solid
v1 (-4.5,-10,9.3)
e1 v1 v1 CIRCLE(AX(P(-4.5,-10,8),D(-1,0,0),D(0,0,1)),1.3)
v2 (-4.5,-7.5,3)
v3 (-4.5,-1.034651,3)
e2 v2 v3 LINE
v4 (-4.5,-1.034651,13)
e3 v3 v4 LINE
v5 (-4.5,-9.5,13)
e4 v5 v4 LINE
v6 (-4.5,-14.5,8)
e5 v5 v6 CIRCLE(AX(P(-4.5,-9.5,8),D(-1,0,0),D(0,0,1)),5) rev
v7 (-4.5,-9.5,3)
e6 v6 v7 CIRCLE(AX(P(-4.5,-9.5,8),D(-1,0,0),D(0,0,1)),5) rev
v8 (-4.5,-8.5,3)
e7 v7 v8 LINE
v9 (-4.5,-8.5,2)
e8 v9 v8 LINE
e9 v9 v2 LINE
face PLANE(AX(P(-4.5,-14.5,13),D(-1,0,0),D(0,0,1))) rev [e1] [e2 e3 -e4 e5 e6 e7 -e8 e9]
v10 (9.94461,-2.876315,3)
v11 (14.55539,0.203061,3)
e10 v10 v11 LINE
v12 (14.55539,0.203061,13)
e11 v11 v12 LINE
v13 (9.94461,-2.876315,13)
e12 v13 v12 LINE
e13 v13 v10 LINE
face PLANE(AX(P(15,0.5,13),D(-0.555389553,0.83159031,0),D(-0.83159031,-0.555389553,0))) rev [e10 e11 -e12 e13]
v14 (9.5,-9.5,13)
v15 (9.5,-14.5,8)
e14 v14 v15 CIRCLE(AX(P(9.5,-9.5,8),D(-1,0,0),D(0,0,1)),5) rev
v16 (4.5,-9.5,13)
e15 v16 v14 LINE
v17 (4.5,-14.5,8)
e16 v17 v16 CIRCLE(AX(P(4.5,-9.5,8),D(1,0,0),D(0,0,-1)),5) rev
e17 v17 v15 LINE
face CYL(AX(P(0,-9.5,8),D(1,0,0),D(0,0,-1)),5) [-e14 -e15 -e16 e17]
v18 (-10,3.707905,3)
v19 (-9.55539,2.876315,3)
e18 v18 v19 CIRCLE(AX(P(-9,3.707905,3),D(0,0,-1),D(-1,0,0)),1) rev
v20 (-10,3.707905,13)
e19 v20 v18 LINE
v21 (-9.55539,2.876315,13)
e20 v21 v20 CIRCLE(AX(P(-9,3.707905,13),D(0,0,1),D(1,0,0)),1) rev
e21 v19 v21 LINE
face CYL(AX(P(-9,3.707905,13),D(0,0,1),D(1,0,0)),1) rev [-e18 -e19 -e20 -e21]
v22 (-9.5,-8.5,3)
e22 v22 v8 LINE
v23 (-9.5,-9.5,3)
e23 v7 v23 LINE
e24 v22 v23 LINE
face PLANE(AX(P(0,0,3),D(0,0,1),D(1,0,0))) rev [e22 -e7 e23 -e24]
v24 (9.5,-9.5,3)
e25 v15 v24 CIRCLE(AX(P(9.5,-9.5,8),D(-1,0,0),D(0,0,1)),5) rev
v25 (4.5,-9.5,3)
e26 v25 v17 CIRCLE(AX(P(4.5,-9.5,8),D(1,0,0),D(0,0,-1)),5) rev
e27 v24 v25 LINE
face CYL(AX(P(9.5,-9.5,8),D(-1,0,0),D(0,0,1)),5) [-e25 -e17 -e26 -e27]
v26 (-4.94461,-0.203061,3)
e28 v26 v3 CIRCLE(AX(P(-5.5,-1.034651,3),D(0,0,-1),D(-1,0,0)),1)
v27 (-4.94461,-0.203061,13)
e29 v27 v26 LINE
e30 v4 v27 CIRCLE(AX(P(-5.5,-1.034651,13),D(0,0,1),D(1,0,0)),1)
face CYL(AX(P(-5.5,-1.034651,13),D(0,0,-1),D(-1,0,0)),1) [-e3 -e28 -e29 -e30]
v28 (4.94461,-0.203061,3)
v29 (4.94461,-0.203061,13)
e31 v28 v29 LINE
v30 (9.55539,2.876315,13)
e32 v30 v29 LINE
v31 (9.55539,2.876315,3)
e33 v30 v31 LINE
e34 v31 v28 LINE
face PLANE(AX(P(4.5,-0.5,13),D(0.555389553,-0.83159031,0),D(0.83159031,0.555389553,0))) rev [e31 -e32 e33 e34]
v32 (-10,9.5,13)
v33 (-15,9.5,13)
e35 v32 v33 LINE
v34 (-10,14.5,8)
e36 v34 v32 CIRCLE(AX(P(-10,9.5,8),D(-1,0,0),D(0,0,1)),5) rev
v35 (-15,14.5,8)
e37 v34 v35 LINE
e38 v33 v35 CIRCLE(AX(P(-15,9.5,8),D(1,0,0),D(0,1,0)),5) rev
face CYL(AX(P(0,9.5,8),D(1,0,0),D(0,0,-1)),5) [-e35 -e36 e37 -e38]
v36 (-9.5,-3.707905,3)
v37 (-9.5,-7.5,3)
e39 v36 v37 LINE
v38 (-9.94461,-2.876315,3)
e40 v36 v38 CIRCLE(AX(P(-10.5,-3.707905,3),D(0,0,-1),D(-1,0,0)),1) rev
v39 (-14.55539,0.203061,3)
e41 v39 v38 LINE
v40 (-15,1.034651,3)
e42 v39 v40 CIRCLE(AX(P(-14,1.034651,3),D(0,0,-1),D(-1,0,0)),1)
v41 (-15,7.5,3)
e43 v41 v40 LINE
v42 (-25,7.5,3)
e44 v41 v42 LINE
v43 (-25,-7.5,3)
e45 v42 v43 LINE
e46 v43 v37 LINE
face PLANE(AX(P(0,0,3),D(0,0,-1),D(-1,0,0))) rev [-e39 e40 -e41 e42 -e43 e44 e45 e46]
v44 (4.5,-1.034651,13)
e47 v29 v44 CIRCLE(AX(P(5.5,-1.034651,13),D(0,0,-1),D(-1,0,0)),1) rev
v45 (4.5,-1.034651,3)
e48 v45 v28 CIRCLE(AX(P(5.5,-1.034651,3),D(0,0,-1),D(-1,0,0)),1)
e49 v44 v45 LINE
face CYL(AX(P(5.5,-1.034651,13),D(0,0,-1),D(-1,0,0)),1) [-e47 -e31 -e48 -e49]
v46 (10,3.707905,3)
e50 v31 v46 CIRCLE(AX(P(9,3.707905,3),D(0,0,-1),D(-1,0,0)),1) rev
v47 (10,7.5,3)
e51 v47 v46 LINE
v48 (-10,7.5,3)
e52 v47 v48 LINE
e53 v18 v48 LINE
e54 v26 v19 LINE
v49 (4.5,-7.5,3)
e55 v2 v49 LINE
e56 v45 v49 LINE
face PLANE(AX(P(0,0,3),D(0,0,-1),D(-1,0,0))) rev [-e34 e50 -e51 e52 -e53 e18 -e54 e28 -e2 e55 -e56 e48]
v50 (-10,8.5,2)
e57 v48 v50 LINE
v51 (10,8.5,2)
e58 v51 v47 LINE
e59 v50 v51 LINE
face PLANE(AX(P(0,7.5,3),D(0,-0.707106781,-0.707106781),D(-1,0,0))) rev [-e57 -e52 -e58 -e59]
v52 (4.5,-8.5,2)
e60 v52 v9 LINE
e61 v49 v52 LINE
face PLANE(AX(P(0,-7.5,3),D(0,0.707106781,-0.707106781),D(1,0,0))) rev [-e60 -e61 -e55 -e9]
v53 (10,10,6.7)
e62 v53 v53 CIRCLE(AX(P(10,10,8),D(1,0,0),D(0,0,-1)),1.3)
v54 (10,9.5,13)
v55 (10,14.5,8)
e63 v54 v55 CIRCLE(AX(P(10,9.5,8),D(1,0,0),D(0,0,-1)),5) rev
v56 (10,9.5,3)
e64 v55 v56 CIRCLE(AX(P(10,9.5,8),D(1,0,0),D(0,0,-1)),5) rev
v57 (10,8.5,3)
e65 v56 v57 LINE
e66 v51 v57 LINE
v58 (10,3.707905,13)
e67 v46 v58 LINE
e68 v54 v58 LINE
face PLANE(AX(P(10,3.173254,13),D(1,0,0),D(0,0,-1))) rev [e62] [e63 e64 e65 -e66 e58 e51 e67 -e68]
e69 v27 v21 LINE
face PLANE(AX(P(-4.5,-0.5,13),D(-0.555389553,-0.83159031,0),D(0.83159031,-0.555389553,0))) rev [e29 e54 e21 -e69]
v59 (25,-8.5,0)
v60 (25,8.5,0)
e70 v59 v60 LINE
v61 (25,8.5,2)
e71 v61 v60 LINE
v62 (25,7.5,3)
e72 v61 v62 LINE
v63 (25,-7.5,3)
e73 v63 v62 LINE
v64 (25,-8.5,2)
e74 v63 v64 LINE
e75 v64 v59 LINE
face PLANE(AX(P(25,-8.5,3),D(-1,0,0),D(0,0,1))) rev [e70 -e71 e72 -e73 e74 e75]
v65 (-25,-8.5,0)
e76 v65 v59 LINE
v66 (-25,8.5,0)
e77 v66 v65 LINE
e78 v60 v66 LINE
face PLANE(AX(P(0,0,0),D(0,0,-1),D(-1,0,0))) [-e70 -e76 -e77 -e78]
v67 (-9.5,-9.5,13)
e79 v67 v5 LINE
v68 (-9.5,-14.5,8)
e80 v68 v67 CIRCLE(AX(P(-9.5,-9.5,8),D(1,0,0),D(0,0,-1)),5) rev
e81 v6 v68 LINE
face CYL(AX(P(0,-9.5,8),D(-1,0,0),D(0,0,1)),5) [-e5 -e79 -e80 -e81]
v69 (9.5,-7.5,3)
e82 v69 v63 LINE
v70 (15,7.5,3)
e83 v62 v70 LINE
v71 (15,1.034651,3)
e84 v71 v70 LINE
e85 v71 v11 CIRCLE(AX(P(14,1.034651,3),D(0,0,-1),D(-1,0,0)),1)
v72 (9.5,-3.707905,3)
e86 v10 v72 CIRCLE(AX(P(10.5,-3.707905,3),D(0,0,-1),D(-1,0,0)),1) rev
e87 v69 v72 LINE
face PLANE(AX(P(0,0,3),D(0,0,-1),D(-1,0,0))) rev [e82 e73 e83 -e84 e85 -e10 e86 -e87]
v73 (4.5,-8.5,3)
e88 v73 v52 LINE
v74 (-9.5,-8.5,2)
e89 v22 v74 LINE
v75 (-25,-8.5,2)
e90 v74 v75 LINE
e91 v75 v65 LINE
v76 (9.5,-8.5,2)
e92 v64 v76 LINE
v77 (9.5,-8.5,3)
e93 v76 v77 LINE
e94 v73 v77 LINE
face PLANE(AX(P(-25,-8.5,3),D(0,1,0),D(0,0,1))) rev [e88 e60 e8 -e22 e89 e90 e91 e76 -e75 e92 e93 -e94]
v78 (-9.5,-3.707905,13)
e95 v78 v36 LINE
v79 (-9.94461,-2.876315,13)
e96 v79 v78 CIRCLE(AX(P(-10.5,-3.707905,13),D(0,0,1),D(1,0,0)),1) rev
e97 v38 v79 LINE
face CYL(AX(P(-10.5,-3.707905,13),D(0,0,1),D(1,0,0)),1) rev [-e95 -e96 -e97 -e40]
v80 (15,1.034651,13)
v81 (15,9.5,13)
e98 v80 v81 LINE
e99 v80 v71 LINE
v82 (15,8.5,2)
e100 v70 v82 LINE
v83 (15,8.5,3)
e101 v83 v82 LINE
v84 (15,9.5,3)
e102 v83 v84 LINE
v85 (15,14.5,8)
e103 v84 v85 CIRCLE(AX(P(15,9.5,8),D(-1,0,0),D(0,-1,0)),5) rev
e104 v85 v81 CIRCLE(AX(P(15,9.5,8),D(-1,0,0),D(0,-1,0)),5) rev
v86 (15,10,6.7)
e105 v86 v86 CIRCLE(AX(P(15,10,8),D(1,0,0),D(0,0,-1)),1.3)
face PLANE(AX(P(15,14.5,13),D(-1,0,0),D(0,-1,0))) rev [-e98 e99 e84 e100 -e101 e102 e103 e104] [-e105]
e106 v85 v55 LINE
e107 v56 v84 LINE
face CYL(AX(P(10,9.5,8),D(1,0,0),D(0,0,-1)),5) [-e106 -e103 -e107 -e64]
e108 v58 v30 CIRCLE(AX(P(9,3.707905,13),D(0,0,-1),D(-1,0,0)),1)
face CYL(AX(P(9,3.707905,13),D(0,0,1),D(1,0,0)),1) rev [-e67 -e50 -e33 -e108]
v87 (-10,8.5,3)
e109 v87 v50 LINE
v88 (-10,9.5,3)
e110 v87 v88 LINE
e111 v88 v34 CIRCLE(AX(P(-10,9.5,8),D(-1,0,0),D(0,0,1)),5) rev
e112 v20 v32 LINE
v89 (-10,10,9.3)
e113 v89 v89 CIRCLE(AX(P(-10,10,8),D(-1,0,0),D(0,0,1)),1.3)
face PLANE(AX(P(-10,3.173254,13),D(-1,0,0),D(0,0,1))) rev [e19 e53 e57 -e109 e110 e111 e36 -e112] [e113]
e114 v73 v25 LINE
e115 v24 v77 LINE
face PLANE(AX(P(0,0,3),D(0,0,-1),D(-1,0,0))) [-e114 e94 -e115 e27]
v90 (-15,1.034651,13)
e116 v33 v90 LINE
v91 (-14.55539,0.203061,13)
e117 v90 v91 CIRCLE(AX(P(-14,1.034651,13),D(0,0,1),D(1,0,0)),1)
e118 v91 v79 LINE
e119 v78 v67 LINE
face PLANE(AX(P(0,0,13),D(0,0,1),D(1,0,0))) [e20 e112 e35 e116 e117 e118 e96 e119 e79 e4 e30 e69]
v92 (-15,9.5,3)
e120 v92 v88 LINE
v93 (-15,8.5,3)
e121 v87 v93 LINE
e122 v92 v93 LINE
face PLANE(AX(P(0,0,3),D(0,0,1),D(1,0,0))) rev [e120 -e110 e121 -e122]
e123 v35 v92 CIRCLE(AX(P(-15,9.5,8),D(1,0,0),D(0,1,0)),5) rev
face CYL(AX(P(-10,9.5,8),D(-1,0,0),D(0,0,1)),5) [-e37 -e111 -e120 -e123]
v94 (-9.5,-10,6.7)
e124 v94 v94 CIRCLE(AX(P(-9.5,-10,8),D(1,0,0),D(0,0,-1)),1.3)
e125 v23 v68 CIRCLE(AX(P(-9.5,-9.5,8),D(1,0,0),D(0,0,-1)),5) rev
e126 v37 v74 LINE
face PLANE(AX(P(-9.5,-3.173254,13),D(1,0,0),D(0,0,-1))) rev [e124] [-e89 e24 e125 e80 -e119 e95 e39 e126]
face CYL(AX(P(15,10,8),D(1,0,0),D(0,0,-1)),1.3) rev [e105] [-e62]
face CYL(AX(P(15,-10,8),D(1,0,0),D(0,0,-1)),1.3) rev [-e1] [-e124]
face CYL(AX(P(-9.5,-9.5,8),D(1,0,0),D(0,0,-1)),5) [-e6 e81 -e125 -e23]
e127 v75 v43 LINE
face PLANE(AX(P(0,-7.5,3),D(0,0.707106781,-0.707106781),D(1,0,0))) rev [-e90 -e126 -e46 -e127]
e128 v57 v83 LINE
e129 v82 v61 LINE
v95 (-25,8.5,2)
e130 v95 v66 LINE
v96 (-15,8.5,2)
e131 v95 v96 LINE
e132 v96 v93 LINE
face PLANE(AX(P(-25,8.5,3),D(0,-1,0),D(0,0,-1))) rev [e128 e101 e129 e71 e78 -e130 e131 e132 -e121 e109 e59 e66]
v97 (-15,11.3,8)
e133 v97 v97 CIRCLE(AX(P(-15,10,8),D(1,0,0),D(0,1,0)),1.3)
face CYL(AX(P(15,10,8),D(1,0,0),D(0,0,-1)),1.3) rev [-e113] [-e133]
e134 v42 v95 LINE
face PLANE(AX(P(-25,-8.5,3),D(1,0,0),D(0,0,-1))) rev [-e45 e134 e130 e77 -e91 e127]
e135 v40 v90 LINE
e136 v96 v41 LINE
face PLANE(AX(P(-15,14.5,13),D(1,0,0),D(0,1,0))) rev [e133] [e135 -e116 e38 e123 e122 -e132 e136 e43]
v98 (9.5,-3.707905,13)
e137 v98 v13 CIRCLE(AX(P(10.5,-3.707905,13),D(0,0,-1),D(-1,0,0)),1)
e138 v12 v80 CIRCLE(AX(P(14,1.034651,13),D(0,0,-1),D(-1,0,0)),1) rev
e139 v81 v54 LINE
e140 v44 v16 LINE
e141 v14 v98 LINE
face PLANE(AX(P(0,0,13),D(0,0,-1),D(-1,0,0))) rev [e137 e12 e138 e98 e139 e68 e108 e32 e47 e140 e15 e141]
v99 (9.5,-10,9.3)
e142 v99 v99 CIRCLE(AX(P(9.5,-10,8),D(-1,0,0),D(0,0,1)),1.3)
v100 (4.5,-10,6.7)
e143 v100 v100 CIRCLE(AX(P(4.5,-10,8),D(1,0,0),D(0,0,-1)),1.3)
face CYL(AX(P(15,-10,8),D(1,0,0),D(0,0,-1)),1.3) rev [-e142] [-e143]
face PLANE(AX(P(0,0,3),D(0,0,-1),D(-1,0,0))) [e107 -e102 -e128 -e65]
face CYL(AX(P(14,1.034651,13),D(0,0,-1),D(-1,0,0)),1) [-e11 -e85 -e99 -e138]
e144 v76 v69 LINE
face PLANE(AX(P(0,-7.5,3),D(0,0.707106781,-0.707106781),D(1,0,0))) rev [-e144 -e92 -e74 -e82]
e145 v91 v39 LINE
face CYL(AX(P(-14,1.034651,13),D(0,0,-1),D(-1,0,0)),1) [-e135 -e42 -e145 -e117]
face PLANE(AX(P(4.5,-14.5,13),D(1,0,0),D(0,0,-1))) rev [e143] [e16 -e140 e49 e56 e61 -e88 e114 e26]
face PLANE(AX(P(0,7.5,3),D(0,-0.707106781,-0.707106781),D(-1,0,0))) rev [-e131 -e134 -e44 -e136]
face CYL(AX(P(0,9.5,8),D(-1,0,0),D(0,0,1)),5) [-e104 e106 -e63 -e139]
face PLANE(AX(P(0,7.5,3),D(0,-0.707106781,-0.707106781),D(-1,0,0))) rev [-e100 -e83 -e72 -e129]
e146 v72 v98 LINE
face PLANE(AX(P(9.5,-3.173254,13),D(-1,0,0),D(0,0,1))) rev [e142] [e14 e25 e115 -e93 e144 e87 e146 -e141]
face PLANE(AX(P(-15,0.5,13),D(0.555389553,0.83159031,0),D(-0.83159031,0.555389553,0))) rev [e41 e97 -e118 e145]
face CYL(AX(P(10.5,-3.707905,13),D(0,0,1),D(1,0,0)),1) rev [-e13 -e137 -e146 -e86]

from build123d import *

# Parameters (mm, degrees)
ESQUISSE1_W                     = 50
ESQUISSE1_H                     = 17
BOSS_EXTRU_1_DEPTH              = 3
BOSS_EXTRU_2_DEPTH              = 10
CONG_1_R                        = 5
CONG_2_R                        = 1
CHANFREIN1_SIZE                 = 1
DIAM_TRE_DU_PER_AGE_2_6_2_6_1_D = 2.6


with BuildPart() as part:
    # Esquisse1 → Boss.-Extru.1 (new body)
    with BuildSketch(Plane.XY):
        Rectangle(ESQUISSE1_W, ESQUISSE1_H)
    extrude(amount=BOSS_EXTRU_1_DEPTH)

    # Esquisse2 → Boss.-Extru.2 (add)
    with BuildSketch(Plane.XY.offset(3)):
        Polygon((-15, 14.5), (-15, 0.5), (-9.5, -3.173254132), (-9.5, -14.5), (-4.5, -14.5), (-4.5, -0.5), (-10, 3.173254132), (-10, 14.5), align=None)
        Polygon((10, 14.5), (15, 14.5), (15, 0.5), (9.5, -3.173254132), (9.5, -14.5), (4.5, -14.5), (4.5, -0.5), (10, 3.173254132), align=None)
    extrude(amount=BOSS_EXTRU_2_DEPTH)

    # Congé1
    cong_1_edges = [part.edges().sort_by_distance(p)[0] for p in [
        (7, -14.5, 13),
        (7, -14.5, 3),
        (-7, -14.5, 3),
        (-7, -14.5, 13),
        (-12.5, 14.5, 13),
        (12.5, 14.5, 13),
        (12.5, 14.5, 3),
        (-12.5, 14.5, 3),
    ]]
    fillet(cong_1_edges, radius=CONG_1_R - 0.0001)  # a hair under: the kernel refuses the full size

    # Congé2
    cong_2_edges = [part.edges().sort_by_distance(p)[0] for p in [
        (-15, 0.5, 8),
        (-9.5, -3.173254132, 8),
        (-4.5, -0.5, 8),
        (-10, 3.173254132, 8),
        (10, 3.173254132, 8),
        (4.5, -0.5, 8),
        (9.5, -3.173254132, 8),
        (15, 0.5, 8),
    ]]
    fillet(cong_2_edges, radius=CONG_2_R)

    # Chanfrein1
    chanfrein1_edges = [part.edges().sort_by_distance(p)[0] for p in [
        (-17.25, -8.5, 3),
        (-20, 8.5, 3),
        (0, -8.5, 3),
        (17.25, -8.5, 3),
        (0, 8.5, 3),
        (20, 8.5, 3),
    ]]
    chamfer(chanfrein1_edges, length=CHANFREIN1_SIZE)

    # Diamètre du perçage Ø2.6 (2.6)1 (through all)
    with Locations(Plane(origin=(15, 0, 0), x_dir=(0, 0, -1), z_dir=(1, 0, 0))):
        with Locations((-8, -10), (-8, 10)):
            Hole(DIAM_TRE_DU_PER_AGE_2_6_2_6_1_D / 2)


solid = part.part
